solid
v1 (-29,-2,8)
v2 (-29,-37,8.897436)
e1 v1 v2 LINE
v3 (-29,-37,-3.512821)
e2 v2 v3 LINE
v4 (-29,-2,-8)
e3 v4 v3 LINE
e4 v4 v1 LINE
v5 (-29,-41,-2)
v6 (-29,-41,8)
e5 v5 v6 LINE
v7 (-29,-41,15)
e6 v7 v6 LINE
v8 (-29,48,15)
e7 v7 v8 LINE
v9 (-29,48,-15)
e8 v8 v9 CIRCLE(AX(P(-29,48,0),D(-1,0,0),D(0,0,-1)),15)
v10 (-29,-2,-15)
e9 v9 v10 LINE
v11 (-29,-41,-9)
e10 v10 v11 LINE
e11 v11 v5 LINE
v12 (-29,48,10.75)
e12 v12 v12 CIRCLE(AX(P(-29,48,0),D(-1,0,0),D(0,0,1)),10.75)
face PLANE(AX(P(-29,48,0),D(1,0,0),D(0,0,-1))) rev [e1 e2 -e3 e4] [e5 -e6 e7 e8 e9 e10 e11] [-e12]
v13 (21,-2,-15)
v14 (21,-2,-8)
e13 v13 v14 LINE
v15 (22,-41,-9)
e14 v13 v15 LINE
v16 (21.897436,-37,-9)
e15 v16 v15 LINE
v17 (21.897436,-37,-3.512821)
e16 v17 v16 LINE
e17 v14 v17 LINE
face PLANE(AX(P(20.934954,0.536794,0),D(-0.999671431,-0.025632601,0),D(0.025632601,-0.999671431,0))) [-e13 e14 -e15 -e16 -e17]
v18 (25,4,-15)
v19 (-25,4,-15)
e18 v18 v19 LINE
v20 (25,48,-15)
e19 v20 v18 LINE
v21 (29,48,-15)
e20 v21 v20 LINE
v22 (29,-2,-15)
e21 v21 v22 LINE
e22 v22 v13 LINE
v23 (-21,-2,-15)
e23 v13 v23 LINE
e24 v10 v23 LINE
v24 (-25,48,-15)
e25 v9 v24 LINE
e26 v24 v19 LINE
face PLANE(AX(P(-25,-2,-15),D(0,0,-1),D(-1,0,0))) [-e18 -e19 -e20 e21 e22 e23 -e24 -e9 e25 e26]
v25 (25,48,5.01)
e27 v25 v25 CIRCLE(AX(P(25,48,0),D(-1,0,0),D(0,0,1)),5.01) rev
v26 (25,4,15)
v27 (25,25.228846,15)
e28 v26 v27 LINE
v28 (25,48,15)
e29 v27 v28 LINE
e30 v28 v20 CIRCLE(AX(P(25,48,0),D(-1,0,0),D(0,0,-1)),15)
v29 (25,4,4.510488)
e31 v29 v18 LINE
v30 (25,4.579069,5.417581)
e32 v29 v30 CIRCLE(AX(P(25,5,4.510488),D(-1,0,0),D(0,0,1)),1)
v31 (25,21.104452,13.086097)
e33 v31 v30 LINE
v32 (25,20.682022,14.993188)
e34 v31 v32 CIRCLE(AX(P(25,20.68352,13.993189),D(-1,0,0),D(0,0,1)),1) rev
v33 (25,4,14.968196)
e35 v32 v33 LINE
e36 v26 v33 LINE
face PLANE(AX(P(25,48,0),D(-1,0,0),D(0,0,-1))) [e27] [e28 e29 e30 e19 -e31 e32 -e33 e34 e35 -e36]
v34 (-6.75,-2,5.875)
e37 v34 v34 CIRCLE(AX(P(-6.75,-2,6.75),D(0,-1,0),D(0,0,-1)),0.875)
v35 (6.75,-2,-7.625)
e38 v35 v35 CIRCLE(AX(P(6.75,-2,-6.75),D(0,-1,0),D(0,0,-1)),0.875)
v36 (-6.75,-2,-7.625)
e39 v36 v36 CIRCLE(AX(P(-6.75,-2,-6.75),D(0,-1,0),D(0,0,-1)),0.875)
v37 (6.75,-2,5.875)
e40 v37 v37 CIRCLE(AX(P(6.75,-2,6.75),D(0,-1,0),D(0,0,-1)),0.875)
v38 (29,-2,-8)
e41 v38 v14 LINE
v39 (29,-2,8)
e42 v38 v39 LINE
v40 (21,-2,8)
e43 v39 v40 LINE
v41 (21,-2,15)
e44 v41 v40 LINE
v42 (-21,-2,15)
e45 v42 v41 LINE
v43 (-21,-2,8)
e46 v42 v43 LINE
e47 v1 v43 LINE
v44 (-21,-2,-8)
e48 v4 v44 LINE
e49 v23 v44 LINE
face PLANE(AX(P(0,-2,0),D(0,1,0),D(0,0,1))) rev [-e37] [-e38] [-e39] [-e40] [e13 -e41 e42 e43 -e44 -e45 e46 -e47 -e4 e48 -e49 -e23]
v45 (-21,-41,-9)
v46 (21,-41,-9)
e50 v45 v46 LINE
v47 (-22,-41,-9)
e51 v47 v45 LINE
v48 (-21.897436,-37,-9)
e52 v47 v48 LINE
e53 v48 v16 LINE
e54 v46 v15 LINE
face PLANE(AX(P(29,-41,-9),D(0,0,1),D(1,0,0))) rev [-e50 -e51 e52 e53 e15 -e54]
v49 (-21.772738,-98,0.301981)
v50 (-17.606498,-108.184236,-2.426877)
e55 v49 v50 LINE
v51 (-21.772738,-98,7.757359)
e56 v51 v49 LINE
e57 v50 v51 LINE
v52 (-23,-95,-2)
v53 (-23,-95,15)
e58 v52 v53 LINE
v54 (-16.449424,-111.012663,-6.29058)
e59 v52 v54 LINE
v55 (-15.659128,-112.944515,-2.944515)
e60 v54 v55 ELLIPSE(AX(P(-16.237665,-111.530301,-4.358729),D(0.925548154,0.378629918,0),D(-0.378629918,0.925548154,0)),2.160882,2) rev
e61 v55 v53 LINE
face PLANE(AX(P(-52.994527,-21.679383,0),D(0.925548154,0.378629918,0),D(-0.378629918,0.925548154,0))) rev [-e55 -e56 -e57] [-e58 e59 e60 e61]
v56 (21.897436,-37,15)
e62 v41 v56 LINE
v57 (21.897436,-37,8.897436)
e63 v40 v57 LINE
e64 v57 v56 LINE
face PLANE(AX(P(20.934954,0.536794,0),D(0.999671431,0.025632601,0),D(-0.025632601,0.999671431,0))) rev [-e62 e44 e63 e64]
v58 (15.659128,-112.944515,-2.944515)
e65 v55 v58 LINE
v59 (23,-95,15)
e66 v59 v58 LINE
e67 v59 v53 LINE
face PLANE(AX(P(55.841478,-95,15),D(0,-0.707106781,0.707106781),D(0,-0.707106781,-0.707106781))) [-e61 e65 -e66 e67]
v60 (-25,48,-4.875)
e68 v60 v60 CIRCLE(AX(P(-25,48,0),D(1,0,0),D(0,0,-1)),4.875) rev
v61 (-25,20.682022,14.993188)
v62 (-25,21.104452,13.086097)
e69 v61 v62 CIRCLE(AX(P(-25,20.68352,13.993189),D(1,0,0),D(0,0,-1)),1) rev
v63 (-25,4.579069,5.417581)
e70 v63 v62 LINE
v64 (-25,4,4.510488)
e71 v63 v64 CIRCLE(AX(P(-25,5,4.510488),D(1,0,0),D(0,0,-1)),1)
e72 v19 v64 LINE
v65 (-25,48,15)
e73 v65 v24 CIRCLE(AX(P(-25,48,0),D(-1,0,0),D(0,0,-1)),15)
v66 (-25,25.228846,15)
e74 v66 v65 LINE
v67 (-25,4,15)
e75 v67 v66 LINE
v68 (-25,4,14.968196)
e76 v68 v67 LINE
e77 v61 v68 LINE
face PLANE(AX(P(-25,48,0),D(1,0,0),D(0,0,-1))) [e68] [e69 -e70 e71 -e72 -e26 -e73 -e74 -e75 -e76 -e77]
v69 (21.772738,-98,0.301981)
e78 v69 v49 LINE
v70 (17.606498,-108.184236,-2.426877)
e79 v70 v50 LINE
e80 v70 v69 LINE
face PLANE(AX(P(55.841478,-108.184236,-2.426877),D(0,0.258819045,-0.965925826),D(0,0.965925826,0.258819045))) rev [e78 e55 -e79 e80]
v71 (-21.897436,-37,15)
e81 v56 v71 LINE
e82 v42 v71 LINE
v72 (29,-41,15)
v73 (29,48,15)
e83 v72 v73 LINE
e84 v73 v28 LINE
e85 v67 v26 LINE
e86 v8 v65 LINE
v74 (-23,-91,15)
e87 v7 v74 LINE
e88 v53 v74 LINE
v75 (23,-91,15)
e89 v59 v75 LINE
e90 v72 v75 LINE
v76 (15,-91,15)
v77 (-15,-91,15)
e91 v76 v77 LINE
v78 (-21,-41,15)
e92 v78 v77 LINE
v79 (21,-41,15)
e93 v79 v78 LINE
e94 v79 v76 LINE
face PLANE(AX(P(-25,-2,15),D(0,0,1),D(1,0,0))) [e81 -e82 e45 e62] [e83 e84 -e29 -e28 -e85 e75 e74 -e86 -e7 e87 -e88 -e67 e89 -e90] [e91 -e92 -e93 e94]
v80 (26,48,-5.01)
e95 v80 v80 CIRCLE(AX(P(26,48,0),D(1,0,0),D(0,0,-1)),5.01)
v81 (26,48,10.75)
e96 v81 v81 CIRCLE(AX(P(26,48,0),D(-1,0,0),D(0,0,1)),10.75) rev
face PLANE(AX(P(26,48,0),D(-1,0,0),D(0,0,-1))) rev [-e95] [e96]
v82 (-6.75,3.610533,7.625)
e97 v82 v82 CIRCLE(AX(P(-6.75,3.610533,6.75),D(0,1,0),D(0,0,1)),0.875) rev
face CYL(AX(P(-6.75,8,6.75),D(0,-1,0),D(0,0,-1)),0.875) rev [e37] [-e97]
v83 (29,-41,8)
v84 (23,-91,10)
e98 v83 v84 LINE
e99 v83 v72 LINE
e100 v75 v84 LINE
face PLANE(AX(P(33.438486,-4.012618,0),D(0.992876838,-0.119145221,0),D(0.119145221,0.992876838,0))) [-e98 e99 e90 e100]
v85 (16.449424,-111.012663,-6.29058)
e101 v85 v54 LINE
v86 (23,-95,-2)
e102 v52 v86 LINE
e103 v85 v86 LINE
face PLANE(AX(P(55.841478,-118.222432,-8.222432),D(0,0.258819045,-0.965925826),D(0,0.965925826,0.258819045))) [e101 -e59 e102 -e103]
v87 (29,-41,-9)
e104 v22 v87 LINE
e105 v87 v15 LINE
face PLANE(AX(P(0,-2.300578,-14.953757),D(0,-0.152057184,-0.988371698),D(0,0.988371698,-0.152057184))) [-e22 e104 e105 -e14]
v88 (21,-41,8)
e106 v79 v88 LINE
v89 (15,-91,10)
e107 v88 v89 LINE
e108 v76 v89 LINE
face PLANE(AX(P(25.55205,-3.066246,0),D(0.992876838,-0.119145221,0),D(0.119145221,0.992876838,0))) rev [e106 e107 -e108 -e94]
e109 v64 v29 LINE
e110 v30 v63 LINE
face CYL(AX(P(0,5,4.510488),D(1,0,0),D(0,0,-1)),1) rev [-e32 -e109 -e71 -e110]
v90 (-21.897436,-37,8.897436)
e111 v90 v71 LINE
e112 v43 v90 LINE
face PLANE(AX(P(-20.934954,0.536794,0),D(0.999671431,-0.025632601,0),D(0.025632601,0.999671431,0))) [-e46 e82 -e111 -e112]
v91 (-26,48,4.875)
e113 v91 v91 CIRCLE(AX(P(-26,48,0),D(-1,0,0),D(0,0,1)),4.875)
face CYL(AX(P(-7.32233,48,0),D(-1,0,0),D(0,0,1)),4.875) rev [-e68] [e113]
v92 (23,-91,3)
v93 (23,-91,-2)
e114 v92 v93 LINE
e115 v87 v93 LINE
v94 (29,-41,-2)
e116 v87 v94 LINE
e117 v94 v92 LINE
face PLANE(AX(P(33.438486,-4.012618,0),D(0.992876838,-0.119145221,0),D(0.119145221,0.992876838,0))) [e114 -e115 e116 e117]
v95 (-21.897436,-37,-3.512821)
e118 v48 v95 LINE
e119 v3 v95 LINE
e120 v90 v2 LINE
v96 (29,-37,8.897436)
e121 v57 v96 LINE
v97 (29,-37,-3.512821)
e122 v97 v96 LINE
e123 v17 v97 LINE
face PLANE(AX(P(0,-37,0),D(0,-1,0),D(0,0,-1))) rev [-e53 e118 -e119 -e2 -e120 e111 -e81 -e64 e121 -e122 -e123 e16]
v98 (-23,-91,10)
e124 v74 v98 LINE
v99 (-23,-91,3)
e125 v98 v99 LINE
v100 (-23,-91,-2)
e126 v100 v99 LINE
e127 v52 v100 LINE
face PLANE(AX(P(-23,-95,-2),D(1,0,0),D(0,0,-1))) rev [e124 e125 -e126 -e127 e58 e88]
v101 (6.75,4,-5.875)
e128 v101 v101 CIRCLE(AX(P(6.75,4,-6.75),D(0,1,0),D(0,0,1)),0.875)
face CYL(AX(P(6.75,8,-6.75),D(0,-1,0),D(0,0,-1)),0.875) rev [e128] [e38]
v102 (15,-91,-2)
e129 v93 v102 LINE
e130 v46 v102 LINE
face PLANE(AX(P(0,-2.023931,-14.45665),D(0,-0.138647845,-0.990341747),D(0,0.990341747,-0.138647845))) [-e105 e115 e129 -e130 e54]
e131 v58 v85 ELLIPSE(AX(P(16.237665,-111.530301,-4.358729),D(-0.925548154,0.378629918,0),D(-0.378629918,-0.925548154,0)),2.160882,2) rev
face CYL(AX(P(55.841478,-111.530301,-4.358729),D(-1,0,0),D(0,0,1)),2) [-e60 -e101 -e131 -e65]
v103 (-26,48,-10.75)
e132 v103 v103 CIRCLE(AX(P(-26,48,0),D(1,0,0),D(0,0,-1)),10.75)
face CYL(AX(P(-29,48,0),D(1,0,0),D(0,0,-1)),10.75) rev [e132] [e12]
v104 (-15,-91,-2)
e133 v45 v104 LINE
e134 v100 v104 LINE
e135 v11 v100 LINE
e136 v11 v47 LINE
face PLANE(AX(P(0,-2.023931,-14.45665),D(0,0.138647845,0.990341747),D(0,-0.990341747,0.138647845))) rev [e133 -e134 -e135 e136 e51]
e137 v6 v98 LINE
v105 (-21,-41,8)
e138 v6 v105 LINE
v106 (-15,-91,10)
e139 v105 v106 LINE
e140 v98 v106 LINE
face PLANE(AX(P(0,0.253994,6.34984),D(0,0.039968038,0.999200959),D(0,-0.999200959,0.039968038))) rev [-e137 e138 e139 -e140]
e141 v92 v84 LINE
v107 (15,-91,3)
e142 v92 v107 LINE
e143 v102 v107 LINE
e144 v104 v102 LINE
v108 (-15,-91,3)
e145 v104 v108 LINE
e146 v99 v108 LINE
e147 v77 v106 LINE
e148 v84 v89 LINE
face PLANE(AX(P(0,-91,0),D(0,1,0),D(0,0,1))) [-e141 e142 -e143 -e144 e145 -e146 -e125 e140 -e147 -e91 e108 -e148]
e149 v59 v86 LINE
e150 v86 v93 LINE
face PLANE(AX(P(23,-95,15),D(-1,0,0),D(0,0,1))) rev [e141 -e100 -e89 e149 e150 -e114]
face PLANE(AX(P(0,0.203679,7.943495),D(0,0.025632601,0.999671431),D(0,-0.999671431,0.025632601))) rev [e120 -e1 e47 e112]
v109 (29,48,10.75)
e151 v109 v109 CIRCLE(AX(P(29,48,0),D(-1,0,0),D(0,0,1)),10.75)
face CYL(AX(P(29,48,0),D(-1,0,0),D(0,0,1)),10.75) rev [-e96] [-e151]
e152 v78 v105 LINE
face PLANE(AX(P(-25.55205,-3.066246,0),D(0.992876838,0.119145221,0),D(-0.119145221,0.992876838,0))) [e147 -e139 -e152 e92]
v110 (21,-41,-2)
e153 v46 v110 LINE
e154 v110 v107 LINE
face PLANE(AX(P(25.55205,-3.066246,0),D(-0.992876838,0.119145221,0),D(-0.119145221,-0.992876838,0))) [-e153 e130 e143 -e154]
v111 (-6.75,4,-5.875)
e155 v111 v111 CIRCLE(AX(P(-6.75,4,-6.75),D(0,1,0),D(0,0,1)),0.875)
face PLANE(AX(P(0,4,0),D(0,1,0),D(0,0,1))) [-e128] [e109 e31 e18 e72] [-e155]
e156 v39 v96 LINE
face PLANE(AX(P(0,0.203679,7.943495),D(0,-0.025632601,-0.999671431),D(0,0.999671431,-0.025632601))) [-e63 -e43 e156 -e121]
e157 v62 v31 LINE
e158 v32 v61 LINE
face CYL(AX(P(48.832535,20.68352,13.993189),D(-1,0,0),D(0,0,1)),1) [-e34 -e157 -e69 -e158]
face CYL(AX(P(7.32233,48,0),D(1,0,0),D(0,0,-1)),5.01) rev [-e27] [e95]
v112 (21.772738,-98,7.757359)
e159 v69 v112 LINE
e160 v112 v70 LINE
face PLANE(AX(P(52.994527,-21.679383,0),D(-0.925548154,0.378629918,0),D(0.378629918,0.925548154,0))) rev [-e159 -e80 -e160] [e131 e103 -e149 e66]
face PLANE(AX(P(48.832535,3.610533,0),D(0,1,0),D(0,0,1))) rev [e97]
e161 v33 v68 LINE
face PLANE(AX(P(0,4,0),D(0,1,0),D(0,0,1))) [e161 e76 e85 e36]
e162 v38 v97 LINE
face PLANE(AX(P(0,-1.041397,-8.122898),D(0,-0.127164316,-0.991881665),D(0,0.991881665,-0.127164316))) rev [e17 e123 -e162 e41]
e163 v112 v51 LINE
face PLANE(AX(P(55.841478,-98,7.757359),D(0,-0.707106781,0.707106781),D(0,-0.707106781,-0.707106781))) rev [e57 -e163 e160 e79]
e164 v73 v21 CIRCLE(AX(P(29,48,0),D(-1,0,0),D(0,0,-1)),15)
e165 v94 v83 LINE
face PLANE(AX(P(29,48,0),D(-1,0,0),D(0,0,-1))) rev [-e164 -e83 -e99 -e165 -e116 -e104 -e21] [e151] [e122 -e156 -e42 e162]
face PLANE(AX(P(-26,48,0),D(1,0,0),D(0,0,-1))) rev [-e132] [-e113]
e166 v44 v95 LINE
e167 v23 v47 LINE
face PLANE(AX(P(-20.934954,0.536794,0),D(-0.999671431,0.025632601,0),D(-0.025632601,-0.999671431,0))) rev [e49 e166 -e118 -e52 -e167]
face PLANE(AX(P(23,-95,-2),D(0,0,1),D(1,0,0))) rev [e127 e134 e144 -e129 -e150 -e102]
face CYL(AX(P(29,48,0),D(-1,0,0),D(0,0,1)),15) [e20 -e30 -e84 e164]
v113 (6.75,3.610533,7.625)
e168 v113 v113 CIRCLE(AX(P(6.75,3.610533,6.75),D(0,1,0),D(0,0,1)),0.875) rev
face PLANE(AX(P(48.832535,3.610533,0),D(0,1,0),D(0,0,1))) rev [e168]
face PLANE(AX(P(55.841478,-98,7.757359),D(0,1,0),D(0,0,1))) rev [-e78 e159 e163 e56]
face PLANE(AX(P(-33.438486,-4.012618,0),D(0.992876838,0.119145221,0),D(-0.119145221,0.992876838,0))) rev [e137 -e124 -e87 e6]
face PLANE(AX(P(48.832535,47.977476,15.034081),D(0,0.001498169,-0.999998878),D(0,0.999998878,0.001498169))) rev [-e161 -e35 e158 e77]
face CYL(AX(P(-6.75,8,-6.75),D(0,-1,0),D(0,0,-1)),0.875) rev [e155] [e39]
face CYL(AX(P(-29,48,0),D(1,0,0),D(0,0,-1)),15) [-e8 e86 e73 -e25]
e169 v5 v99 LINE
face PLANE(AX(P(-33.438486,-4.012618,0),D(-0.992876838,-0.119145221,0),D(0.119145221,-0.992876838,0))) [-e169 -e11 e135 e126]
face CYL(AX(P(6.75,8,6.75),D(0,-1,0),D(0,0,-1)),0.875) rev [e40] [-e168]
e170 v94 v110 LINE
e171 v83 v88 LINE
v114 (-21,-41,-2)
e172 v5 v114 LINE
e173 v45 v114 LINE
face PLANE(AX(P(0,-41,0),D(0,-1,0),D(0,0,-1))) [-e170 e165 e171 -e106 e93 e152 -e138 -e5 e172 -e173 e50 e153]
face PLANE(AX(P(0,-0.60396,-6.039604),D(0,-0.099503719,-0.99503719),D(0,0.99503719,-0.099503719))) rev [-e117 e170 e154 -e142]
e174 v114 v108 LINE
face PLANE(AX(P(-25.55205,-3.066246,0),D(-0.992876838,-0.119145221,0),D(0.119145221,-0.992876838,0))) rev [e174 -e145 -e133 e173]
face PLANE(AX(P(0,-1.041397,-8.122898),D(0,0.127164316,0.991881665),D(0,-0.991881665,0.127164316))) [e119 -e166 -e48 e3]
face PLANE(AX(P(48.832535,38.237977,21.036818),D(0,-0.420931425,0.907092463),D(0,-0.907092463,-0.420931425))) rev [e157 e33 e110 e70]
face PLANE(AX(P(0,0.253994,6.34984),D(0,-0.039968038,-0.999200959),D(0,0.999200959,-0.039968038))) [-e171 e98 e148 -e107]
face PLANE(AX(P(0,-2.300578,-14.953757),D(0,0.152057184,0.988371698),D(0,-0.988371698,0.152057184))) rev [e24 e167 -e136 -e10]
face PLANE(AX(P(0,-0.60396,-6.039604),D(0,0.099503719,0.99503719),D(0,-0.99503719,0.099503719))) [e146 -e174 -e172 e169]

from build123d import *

# Parameters (mm, degrees)
BOSS_EXTRUDE1_DEPTH      = 4
BOSS_EXTRUDE1_DEPTH_BACK = 2
SKETCH2_W                = 50
SKETCH2_H                = 30
SKETCH3_R                = 10.75
BOSS_EXTRUDE2_DEPTH      = 4
SKETCH4_R                = 10.75
SKETCH4_R_2              = 6.25
BOSS_EXTRUDE3_DEPTH      = 1
SKETCH5_R                = 6.25
SKETCH5_R_2              = 5.01
BOSS_EXTRUDE4_DEPTH      = 1
BOSS_EXTRUDE5_START      = -1
SKETCH6_R                = 6.25
SKETCH6_R_2              = 4.875
BOSS_EXTRUDE5_DEPTH      = 1
SKETCH8_R                = 0.875
CUT_EXTRUDE1_DEPTH       = 10
SKETCH9_W                = 58
SKETCH9_H                = 24
BOSS_EXTRUDE6_DEPTH      = 4
SKETCH15_W               = 46
SKETCH15_H               = 17
BOSS_EXTRUDE7_DEPTH      = 4
BOSS_EXTRUDE8_DEPTH      = 46
SKETCH18_W               = 91.307129758
SKETCH18_H               = 96.091784827
CUT_EXTRUDE3_DEPTH       = 21
FILLET1_R                = 2
BOSS_EXTRUDE9_START      = -4
BOSS_EXTRUDE9_DEPTH      = 50
FILLET3_R                = 1
FILLET4_R                = 1


with BuildPart() as part:
    # Sketch2 → Boss-Extrude1 (new, two sides: drawn at the far end of the back side and taken through both)
    with BuildSketch(Plane(origin=(0, 0, 0), x_dir=(1, 0, 0), z_dir=(0, 1, 0)).offset(-BOSS_EXTRUDE1_DEPTH_BACK)):
        Rectangle(SKETCH2_W, SKETCH2_H)
    extrude(amount=BOSS_EXTRUDE1_DEPTH + BOSS_EXTRUDE1_DEPTH_BACK)

    # Sketch3 → Boss-Extrude2 (add)
    with BuildSketch(Plane.ZY.offset(25)):
        with BuildLine():
            Line((-15, -2), (-15, 48))
            ThreePointArc((-15, 48), (0, 63), (15, 48))
            Line((15, 48), (15, -2))
            Line((15, -2), (-15, -2))
        make_face()
        with Locations((0, 48)):
            Circle(SKETCH3_R, mode=Mode.SUBTRACT)
    boss_extrude2 = extrude(amount=BOSS_EXTRUDE2_DEPTH)

    # Mirror1: Boss-Extrude2 across plane
    add(boss_extrude2.mirror(Plane(origin=(0, 0, 0), x_dir=(0, 0, 1), z_dir=(1, 0, 0))))

    # Sketch4 → Boss-Extrude3 (add)
    with BuildSketch(Plane(origin=(-25, 0, 0), x_dir=(0, 0, -1), z_dir=(1, 0, 0))):
        with Locations((0, 48)):
            Circle(SKETCH4_R)
        with Locations((0, 48)):
            Circle(SKETCH4_R_2, mode=Mode.SUBTRACT)
    boss_extrude3 = extrude(amount=-BOSS_EXTRUDE3_DEPTH)

    # Mirror2: Boss-Extrude3 across plane
    add(boss_extrude3.mirror(Plane(origin=(0, 0, 0), x_dir=(0, 0, 1), z_dir=(1, 0, 0))))

    # Sketch5 → Boss-Extrude4 (add)
    with BuildSketch(Plane(origin=(26, 0, 0), x_dir=(0, 0, -1), z_dir=(1, 0, 0))):
        with Locations((0, 48)):
            Circle(SKETCH5_R)
        with Locations((0, 48)):
            Circle(SKETCH5_R_2, mode=Mode.SUBTRACT)
    extrude(amount=-BOSS_EXTRUDE4_DEPTH)

    # Sketch6 → Boss-Extrude5 (add)
    with BuildSketch(Plane.ZY.offset(26).offset(BOSS_EXTRUDE5_START)):
        with Locations((0, 48)):
            Circle(SKETCH6_R)
        with Locations((0, 48)):
            Circle(SKETCH6_R_2, mode=Mode.SUBTRACT)
    extrude(amount=BOSS_EXTRUDE5_DEPTH)

    # Sketch8 → Cut-Extrude1 (cut)
    with BuildSketch(Plane.XZ.offset(2)):
        with Locations(Location((-6.75, 6.75, 0), (0, 0, 270))):
            Circle(SKETCH8_R)
        with Locations(Location((6.75, 6.75, 0), (0, 0, 270))):
            Circle(SKETCH8_R)
        with Locations(Location((6.75, -6.75, 0), (0, 0, 270))):
            Circle(SKETCH8_R)
        with Locations(Location((-6.75, -6.75, 0), (0, 0, 270))):
            Circle(SKETCH8_R)
    extrude(amount=-CUT_EXTRUDE1_DEPTH, mode=Mode.SUBTRACT)



with BuildPart() as body_2:
    # Sketch9 → Boss-Extrude6 (new body)
    with BuildSketch(Plane(origin=(0, -37, 0), x_dir=(-1, 0, 0), z_dir=(0, -1, 0))):
        with Locations((0, -3)):
            Rectangle(SKETCH9_W, SKETCH9_H)
    extrude(amount=BOSS_EXTRUDE6_DEPTH)


with BuildPart() as part_1:
    add(part.part)

    add(body_2.part)  # Loft3 merges body 2
    # Sketch11 → Loft3 section 0
    with BuildSketch(Plane.XZ.offset(2)):
        with BuildLine():
            Line((-29, -15), (-21, -15))
            Line((-21, -15), (-21, -8))
            Line((-21, -8), (-29, -8))
            Line((-29, -8), (-29, -15))
        make_face()
    # Sketch10 → Loft3 section 1
    with BuildSketch(Plane.XZ.offset(41)):
        with BuildLine():
            Line((-29, -9), (-22, -9))
            Line((-22, -9), (-22, -3))
            Line((-22, -3), (-29, -3))
            Line((-29, -3), (-29, -9))
        make_face()
    loft()

    # Sketch11<6> → Loft4 section 0
    with BuildSketch(Plane.XZ.offset(2)):
        with BuildLine():
            Line((-29, 15), (-21, 15))
            Line((-21, 15), (-21, 8))
            Line((-21, 8), (-29, 8))
            Line((-29, 8), (-29, 15))
        make_face()
    # Sketch10<6> → Loft4 section 1
    with BuildSketch(Plane.XZ.offset(41)):
        with BuildLine():
            Line((-29, 15), (-22, 15))
            Line((-22, 15), (-22, 9))
            Line((-22, 9), (-29, 9))
            Line((-29, 9), (-29, 15))
        make_face()
    loft()

    # Sketch11<7> → Loft5 section 0
    with BuildSketch(Plane.XZ.offset(2)):
        with BuildLine():
            Line((29, 15), (21, 15))
            Line((21, 15), (21, 8))
            Line((21, 8), (29, 8))
            Line((29, 8), (29, 15))
        make_face()
    # Sketch10<7> → Loft5 section 1
    with BuildSketch(Plane.XZ.offset(41)):
        with BuildLine():
            Line((29, 15), (22, 15))
            Line((22, 15), (22, 9))
            Line((22, 9), (29, 9))
            Line((29, 9), (29, 15))
        make_face()
    loft()

    # Sketch11<8> → Loft6 section 0
    with BuildSketch(Plane.XZ.offset(2)):
        with BuildLine():
            Line((29, -15), (21, -15))
            Line((21, -15), (21, -8))
            Line((21, -8), (29, -8))
            Line((29, -8), (29, -15))
        make_face()
    # Sketch10<8> → Loft6 section 1
    with BuildSketch(Plane.XZ.offset(41)):
        with BuildLine():
            Line((29, -9), (22, -9))
            Line((22, -9), (22, -3))
            Line((22, -3), (29, -3))
            Line((29, -3), (29, -9))
        make_face()
    loft()

    # Sketch14 → Loft7 section 0
    with BuildSketch(Plane.XZ.offset(41)):
        with BuildLine():
            Line((-29, -9), (-21, -9))
            Line((-21, -9), (-21, -2))
            Line((-21, -2), (-29, -2))
            Line((-29, -2), (-29, -9))
        make_face()
    # Sketch13 → Loft7 section 1
    with BuildSketch(Plane(origin=(0, -91, 0), x_dir=(-1, 0, 0), z_dir=(0, -1, 0))):
        with BuildLine():
            Line((23, 2), (15, 2))
            Line((15, 2), (15, -3))
            Line((15, -3), (23, -3))
            Line((23, -3), (23, 2))
        make_face()
    loft()

    # Loft8: read off the stored shape, not the designer's step
    # Loft8: loft between two sections, ruled curve by curve
    loft8_from = [
        Edge.make_line((21, -41, -2), (29, -41, -2)),
        Edge.make_line((29, -41, -2), (29, -41, -9)),
        Edge.make_line((21, -41, -9), (21, -41, -2)),
        Edge.make_line((21, -41, -9), (29, -41, -9)),
    ]
    loft8_to = [
        Edge.make_line((15, -91, 3), (23, -91, 3)),
        Edge.make_line((23, -91, 3), (23, -91, -2)),
        Edge.make_line((15, -91, -2), (15, -91, 3)),
        Edge.make_line((15, -91, -2), (23, -91, -2)),
    ]
    loft8 = Solid(Shell([*[Face.make_surface_from_curves(loft8_from[k], loft8_to[k]) for k in range(4)], Face(Wire(loft8_from)), Face(Wire(loft8_to))]))
    add(loft8)

    # Loft9: read off the stored shape, not the designer's step
    # Loft9: loft between two sections, ruled curve by curve
    loft9_from = [
        Edge.make_line((29, -41, 15), (29, -41, 8)),
        Edge.make_line((21, -41, 8), (21, -41, 15)),
        Edge.make_line((29, -41, 8), (21, -41, 8)),
        Edge.make_line((21, -41, 15), (29, -41, 15)),
    ]
    loft9_to = [
        Edge.make_line((23, -91, 15), (23, -91, 10)),
        Edge.make_line((15, -91, 10), (15, -91, 15)),
        Edge.make_line((23, -91, 10), (15, -91, 10)),
        Edge.make_line((15, -91, 15), (23, -91, 15)),
    ]
    loft9 = Solid(Shell([*[Face.make_surface_from_curves(loft9_from[k], loft9_to[k]) for k in range(4)], Face(Wire(loft9_from)), Face(Wire(loft9_to))]))
    add(loft9)

    # Loft10: read off the stored shape, not the designer's step
    # Loft10: loft between two sections, ruled curve by curve
    loft10_from = [
        Edge.make_line((-21, -41, 15), (-21, -41, 8)),
        Edge.make_line((-29, -41, 8), (-29, -41, 15)),
        Edge.make_line((-21, -41, 8), (-29, -41, 8)),
        Edge.make_line((-29, -41, 15), (-21, -41, 15)),
    ]
    loft10_to = [
        Edge.make_line((-15, -91, 15), (-15, -91, 10)),
        Edge.make_line((-23, -91, 10), (-23, -91, 15)),
        Edge.make_line((-15, -91, 10), (-23, -91, 10)),
        Edge.make_line((-23, -91, 15), (-15, -91, 15)),
    ]
    loft10 = Solid(Shell([*[Face.make_surface_from_curves(loft10_from[k], loft10_to[k]) for k in range(4)], Face(Wire(loft10_from)), Face(Wire(loft10_to))]))
    add(loft10)

    # Sketch15 → Boss-Extrude7 (add)
    with BuildSketch(Plane.XZ.offset(91)):
        with Locations((0, 6.5)):
            Rectangle(SKETCH15_W, SKETCH15_H)
    extrude(amount=BOSS_EXTRUDE7_DEPTH)

    # Sketch16 → Boss-Extrude8 (add)
    with BuildSketch(Plane.ZY.offset(23)):
        Polygon((15, -95), (-2, -95), (-8.222431864, -118.222431864), align=None)
        Polygon((-2.426876907, -108.184236219), (0.301980964, -98), (7.757359313, -98), align=None, mode=Mode.SUBTRACT)
    extrude(amount=-BOSS_EXTRUDE8_DEPTH)

    # Sketch18 → Cut-Extrude3 (cut)
    with BuildSketch(Plane(origin=(-52.994526892, -21.679383469, 0), x_dir=(0, 0, -1), z_dir=(0.9255481540620362, 0.37862991761396436, 0))):
        with Locations((11.5562698, -126.796989603)):
            Rectangle(SKETCH18_W, SKETCH18_H)
    cut_extrude3 = extrude(amount=-CUT_EXTRUDE3_DEPTH, mode=Mode.SUBTRACT)

    # Mirror3: Cut-Extrude3 across plane
    add(cut_extrude3.mirror(Plane.ZY), mode=Mode.SUBTRACT)

    # Fillet1
    fillet1_edges = [part_1.edges().sort_by_distance(p)[0] for p in [
        (0, -118.222431864, -8.222431864),
    ]]
    fillet(fillet1_edges, radius=FILLET1_R)

    # Sketch22 → Boss-Extrude9 (add)
    with BuildSketch(Plane.ZY.offset(29).offset(BOSS_EXTRUDE9_START)):
        Polygon((14.968137022, 3.610533067), (9.468137022, 3.610533067), (4.968137022, 3.610533067), (15, 25.228846085), (14.968137022, 3.960925502), align=None)
    extrude(amount=-BOSS_EXTRUDE9_DEPTH)

    # Fillet3
    fillet3_edges = [part_1.edges().sort_by_distance(p)[0] for p in [
        (0, 4, 5.148867077),
    ]]
    fillet(fillet3_edges, radius=FILLET3_R)

    # Fillet4
    fillet4_edges = [part_1.edges().sort_by_distance(p)[0] for p in [
        (0, 25.228846085, 15),
    ]]
    fillet(fillet4_edges, radius=FILLET4_R)


solid = part_1.part
